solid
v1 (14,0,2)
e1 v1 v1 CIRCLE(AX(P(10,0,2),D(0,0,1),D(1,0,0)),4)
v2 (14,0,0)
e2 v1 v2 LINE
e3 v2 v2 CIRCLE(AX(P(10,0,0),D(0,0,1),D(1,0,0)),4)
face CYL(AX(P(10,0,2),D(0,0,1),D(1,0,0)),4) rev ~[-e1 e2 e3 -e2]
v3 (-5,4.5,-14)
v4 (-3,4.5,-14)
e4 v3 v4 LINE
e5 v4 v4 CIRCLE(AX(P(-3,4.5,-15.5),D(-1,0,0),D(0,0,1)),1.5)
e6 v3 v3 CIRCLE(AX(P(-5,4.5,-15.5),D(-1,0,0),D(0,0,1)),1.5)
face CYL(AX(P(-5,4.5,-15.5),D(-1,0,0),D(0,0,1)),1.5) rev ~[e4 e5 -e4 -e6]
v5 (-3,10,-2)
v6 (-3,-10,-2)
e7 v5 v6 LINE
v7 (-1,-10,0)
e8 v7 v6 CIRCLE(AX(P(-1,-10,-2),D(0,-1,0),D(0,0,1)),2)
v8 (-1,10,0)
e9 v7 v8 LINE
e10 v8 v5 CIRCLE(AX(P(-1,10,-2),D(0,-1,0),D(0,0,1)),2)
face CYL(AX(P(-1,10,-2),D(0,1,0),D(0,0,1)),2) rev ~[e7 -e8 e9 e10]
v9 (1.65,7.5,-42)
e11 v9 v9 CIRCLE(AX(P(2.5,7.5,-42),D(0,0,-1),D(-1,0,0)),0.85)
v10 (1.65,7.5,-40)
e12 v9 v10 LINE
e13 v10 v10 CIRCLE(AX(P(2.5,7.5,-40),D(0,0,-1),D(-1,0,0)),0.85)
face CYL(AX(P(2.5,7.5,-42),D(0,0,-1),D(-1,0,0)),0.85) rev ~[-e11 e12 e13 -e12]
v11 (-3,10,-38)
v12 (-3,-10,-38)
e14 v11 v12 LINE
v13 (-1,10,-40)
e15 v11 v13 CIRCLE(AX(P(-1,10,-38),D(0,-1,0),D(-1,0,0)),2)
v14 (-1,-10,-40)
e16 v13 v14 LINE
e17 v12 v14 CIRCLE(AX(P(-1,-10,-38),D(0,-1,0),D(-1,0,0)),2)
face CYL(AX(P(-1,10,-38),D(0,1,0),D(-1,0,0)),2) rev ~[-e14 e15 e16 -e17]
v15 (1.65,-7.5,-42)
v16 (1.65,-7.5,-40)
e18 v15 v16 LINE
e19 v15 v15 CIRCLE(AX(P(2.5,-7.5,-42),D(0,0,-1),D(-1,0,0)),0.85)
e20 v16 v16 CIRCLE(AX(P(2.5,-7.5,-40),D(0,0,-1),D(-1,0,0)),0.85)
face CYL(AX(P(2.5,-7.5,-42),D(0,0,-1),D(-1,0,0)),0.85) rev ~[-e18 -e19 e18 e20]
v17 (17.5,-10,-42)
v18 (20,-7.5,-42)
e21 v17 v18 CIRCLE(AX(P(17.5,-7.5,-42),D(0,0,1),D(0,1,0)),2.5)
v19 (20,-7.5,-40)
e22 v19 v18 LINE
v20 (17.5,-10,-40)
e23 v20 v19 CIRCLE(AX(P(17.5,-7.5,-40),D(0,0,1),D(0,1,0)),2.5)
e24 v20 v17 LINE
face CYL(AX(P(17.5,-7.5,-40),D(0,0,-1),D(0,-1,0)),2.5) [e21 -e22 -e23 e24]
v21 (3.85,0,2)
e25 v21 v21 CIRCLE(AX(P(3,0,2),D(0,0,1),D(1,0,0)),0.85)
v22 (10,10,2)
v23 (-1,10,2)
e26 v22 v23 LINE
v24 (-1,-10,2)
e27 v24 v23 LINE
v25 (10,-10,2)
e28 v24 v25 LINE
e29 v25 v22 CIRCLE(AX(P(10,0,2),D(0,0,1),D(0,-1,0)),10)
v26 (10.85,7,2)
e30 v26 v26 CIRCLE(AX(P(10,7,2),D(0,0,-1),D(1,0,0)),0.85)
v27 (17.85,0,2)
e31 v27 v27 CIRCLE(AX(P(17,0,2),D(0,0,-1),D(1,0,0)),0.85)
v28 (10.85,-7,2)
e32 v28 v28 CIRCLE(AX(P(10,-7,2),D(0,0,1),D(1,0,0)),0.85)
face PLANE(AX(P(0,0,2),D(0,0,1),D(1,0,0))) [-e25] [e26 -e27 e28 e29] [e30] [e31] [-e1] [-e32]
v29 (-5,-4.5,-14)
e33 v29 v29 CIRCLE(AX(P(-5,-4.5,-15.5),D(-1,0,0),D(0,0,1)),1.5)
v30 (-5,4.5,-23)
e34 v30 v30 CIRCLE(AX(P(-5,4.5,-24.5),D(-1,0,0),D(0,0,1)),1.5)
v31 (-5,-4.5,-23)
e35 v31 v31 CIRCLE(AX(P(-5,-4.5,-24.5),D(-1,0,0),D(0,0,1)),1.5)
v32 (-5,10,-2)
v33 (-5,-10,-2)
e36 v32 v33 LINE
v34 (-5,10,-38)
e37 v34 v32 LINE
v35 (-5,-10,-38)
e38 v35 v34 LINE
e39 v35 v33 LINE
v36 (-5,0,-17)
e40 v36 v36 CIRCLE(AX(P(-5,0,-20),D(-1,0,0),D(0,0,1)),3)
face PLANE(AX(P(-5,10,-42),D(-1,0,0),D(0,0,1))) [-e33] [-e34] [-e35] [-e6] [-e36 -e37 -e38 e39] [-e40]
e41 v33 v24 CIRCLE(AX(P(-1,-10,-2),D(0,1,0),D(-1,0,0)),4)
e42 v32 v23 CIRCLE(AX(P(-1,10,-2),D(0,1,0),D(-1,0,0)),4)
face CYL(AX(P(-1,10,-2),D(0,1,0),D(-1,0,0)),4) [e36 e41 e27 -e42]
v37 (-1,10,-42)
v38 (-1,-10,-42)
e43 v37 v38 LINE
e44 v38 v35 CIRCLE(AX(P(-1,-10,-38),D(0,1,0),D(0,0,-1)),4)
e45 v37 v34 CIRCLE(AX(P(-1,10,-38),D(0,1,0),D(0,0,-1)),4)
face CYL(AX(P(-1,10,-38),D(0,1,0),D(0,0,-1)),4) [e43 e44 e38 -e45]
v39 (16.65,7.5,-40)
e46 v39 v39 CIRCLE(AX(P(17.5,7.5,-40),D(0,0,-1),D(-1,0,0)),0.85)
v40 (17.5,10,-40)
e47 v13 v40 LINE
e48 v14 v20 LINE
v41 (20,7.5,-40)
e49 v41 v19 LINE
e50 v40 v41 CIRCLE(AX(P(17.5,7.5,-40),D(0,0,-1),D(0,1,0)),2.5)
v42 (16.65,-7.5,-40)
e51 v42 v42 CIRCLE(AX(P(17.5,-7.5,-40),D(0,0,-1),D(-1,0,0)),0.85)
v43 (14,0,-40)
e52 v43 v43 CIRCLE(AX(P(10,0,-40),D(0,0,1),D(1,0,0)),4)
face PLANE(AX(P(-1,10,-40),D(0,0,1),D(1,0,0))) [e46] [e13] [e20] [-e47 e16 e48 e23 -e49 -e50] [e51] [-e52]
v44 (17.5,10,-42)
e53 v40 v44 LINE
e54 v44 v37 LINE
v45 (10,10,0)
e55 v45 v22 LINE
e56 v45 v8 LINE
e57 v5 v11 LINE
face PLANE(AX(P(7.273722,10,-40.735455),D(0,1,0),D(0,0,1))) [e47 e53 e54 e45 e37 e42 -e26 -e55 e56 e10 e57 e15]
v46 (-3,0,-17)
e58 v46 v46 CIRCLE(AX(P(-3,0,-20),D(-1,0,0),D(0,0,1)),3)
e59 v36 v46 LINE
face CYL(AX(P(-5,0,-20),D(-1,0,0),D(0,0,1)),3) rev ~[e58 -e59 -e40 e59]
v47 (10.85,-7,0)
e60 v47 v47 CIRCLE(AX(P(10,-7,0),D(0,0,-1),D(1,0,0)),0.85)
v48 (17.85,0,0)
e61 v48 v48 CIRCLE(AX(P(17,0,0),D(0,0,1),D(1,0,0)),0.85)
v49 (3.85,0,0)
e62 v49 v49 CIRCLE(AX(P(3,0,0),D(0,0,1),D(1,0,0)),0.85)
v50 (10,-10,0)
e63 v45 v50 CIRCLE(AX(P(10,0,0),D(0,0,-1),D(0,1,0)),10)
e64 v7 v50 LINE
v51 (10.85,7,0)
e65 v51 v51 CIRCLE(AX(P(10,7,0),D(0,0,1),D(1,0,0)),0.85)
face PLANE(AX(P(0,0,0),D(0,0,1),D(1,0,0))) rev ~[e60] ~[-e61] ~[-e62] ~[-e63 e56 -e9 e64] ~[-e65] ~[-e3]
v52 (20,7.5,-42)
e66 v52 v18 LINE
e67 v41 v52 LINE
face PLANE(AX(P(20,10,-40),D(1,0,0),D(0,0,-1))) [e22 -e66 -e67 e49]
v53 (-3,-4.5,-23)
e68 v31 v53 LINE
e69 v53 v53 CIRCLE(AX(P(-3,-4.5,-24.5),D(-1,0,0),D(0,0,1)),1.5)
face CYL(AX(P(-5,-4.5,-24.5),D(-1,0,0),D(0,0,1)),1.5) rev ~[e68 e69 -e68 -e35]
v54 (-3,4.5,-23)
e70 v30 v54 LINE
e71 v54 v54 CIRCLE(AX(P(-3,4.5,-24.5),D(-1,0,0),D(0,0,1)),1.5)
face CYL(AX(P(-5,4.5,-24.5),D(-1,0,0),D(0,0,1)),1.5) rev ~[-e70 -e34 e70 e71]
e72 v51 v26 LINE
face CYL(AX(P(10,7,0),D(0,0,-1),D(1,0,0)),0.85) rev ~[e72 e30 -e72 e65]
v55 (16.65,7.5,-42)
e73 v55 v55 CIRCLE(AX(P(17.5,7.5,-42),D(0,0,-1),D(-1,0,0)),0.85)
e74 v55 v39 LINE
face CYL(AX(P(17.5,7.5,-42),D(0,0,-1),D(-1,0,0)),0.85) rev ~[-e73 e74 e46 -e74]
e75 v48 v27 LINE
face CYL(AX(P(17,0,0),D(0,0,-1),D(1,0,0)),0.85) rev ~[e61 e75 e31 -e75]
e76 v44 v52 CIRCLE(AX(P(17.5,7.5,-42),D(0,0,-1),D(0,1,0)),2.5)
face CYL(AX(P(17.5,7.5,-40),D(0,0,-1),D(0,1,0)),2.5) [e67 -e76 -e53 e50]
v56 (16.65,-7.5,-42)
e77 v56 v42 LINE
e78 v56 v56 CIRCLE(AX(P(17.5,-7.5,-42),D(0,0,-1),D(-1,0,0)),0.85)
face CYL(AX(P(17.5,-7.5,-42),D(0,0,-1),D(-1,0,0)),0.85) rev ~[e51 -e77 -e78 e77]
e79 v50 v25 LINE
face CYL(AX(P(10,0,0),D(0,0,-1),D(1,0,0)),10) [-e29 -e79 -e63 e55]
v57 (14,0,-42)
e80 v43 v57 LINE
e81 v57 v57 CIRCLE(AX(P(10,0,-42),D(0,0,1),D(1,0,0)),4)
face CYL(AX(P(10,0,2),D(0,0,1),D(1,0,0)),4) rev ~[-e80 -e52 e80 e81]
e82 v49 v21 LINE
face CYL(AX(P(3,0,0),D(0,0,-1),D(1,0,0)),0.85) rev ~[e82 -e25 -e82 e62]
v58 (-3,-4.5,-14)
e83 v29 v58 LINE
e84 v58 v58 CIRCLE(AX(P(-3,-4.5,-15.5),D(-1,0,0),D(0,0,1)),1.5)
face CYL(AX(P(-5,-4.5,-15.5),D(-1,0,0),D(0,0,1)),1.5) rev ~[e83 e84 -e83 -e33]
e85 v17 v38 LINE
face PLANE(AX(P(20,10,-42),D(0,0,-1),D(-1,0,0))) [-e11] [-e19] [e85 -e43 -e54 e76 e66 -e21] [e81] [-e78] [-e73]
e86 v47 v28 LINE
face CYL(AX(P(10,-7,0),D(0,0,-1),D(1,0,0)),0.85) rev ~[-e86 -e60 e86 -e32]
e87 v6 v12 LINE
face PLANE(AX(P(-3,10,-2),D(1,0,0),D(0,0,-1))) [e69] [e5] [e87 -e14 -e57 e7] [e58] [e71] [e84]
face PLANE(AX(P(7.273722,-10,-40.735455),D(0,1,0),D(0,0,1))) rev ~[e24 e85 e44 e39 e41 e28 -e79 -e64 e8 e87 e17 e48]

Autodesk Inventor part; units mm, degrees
ref_plane "YZ Plane" through (0, 0, 0) normal (1, 0, 0) x (0, 1, 0)
ref_plane "XZ Plane" through (0, 0, 0) normal (0, 1, 0) x (-1, 0, 0)
ref_plane "XY Plane" through (0, 0, 0) normal (0, 0, 1) x (1, 0, 0)
sketch "Sketch1" plane through (0, 0, 0) normal (0, 0, 1) x (1, 0, 0)
  line L0 (2.5, 10) -> (37.5, 10) construction
  line L1 (0, -7.5) -> (0, 7.5) construction
  line L2 (37.5, -10) -> (2.5, -10) construction
  circle A0 centre (10, -7) radius 0.85
  circle A1 centre (10, 7) radius 0.85
  circle A2 centre (3, 0) radius 0.85
  circle A3 centre (10, 0) radius 10
  line L3 (10, 7) -> (10, -7) construction
  circle A4 centre (17, 0) radius 0.85
  line L4 (10, 10) -> (-5, 10)
  line L5 (-5, 10) -> (-5, -10)
  line L6 (-5, -10) -> (10, -10)
  line L7 (10, -10) -> (10, 10)
  line L8 (10, 0) -> (20, 0)
  point P0 (0, 0)
  dimension "d0" = 25
extrude "Plate1" add sketch "Sketch1" along normal blind 2 contours A0 L7 L8 A4 A3 | A0 L7 A3 A1 | L7 A1 A3 L8 A4 | L6 L5 L4 A3
sketch "Sketch2" plane through (-3, 10, 2) normal (-1, 0, 0) x (0, -1, 0)
  line L0 (20, 0) -> (0, 0)
  line L1 (0, 0) -> (0, -44)
  line L2 (0, -44) -> (20, -44)
  line L3 (20, -44) -> (20, 0)
edge flange "Flange1" height 44 angle 90 thickness 2 bend radius 2 thickness toward (-1, 0, 0) relief tear relief width 2 relief depth 1 edges at (-5, 0, 0) wall of the first edge with corners at (-3, -10, 2) (-3, 10, 2) (-3, 10, -42) (-3, -10, -42)
bend "Bend1"
corner "Corner1"
sketch "Sketch3" plane through (-5, 10, -40) normal (0, 0, -1) x (-1, 0, 0)
  line L0 (0, -20) -> (0, 0)
  line L1 (0, 0) -> (-25, 0)
  line L2 (-25, 0) -> (-25, -20)
  line L3 (-25, -20) -> (0, -20)
edge flange "Flange2" height 25 angle 90 thickness 2 bend radius 2 thickness toward (0, 0, -1) relief tear relief width 2 relief depth 1 edges at (-3, 0, -42) wall of the first edge with corners at (-5, -10, -40) (-5, 10, -40) (20, 10, -40) (20, -10, -40)
bend "Bend2"
corner "Corner2"
fillet "Fillet1" radius 2.5 2 edges at (20, 10, -41) (20, -10, -41)
sketch "Sketch4" plane through (-1, -10, -42) normal (0, 0, -1) x (-1, 0, 0)
  circle A0 centre (-18.5, 2.5) radius 0.85 projected
  circle A1 centre (-18.5, 17.5) radius 0.85 projected
  circle A2 centre (-3.5, 17.5) radius 0.85 projected
  circle A3 centre (-3.5, 2.5) radius 0.85 projected
  point P0 (-1, 10)
extrude "Cut1" cut sketch "Sketch4" against normal blind 2
sketch "Sketch5" plane through (-5, -10, -2) normal (-1, 0, 0) x (0, 0, 1)
  line L0 (-36, 20) -> (0, 20) construction
  line L1 (-18, 20) -> (-18, 0) construction
  line L2 (0, 0) -> (-36, 0) construction
  circle A0 centre (-18, 10) radius 3
  line L3 (-22.5, 14.5) -> (-13.5, 14.5) construction
  line L4 (-13.5, 14.5) -> (-13.5, 5.5) construction
  line L5 (-13.5, 5.5) -> (-22.5, 5.5) construction
  line L6 (-22.5, 5.5) -> (-22.5, 14.5) construction
  line L7 (-22.5, 14.5) -> (-13.5, 5.5) construction
  circle A1 centre (-13.5, 14.5) radius 1.5
  circle A2 centre (-22.5, 14.5) radius 1.5
  circle A3 centre (-22.5, 5.5) radius 1.5
  circle A4 centre (-13.5, 5.5) radius 1.5
  point P0 (2, 10)
  dimension "d25" = 6
  dimension "d26" = 9
  dimension "d27" = 3
extrude "Cut2" cut sketch "Sketch5" against normal blind 2
sketch "Sketch6" plane through (0, 0, 2) normal (0, 0, 1) x (1, 0, 0)
  arc A0 (10, -10) -> (10, 10) centre (10, 0) ccw construction
  circle A1 centre (10, 0) radius 4
  point P0 (0, 0)
  dimension "d30" = 8
extrude "Cut3" cut sketch "Sketch6" against normal through all
equation "\"d23\" = Thickness"
equation "\"d28\" = Thickness"
equation "\"d31\" = Thickness"
equation "\"d1\" = Thickness"
equation "\"d2\" = BendReliefWidth"
equation "\"d3\" = BendReliefDepth"
equation "\"d4\" = MinimumRemnant"
equation "\"d5\" = TransitionRadius"
equation "\"d8\" = BendRadius"
equation "\"d9\" = CornerReliefSize"
equation "\"d10\" = GapSize"
equation "\"d11\" = JacobiRadiusSize"
equation "\"d12\" = BendReliefWidth"
equation "\"d13\" = BendReliefDepth"
equation "\"d14\" = MinimumRemnant"
equation "\"d15\" = TransitionRadius"
equation "\"d18\" = BendRadius"
equation "\"d19\" = CornerReliefSize"
equation "\"d20\" = GapSize"
equation "\"d21\" = JacobiRadiusSize"
equation "\"BendRadius\" = Thickness"
equation "\"BendReliefWidth\" = Thickness"
equation "\"BendReliefDepth\" = 0.5 * Thickness"
equation "\"CornerReliefSize\" = 4 * Thickness"
equation "\"MinimumRemnant\" = 2 * Thickness"
equation "\"TransitionRadius\" = BendRadius"
equation "\"JacobiRadiusSize\" = BendRadius"
equation "\"GapSize\" = Thickness"
equation "\"Thickness\" = 2"
